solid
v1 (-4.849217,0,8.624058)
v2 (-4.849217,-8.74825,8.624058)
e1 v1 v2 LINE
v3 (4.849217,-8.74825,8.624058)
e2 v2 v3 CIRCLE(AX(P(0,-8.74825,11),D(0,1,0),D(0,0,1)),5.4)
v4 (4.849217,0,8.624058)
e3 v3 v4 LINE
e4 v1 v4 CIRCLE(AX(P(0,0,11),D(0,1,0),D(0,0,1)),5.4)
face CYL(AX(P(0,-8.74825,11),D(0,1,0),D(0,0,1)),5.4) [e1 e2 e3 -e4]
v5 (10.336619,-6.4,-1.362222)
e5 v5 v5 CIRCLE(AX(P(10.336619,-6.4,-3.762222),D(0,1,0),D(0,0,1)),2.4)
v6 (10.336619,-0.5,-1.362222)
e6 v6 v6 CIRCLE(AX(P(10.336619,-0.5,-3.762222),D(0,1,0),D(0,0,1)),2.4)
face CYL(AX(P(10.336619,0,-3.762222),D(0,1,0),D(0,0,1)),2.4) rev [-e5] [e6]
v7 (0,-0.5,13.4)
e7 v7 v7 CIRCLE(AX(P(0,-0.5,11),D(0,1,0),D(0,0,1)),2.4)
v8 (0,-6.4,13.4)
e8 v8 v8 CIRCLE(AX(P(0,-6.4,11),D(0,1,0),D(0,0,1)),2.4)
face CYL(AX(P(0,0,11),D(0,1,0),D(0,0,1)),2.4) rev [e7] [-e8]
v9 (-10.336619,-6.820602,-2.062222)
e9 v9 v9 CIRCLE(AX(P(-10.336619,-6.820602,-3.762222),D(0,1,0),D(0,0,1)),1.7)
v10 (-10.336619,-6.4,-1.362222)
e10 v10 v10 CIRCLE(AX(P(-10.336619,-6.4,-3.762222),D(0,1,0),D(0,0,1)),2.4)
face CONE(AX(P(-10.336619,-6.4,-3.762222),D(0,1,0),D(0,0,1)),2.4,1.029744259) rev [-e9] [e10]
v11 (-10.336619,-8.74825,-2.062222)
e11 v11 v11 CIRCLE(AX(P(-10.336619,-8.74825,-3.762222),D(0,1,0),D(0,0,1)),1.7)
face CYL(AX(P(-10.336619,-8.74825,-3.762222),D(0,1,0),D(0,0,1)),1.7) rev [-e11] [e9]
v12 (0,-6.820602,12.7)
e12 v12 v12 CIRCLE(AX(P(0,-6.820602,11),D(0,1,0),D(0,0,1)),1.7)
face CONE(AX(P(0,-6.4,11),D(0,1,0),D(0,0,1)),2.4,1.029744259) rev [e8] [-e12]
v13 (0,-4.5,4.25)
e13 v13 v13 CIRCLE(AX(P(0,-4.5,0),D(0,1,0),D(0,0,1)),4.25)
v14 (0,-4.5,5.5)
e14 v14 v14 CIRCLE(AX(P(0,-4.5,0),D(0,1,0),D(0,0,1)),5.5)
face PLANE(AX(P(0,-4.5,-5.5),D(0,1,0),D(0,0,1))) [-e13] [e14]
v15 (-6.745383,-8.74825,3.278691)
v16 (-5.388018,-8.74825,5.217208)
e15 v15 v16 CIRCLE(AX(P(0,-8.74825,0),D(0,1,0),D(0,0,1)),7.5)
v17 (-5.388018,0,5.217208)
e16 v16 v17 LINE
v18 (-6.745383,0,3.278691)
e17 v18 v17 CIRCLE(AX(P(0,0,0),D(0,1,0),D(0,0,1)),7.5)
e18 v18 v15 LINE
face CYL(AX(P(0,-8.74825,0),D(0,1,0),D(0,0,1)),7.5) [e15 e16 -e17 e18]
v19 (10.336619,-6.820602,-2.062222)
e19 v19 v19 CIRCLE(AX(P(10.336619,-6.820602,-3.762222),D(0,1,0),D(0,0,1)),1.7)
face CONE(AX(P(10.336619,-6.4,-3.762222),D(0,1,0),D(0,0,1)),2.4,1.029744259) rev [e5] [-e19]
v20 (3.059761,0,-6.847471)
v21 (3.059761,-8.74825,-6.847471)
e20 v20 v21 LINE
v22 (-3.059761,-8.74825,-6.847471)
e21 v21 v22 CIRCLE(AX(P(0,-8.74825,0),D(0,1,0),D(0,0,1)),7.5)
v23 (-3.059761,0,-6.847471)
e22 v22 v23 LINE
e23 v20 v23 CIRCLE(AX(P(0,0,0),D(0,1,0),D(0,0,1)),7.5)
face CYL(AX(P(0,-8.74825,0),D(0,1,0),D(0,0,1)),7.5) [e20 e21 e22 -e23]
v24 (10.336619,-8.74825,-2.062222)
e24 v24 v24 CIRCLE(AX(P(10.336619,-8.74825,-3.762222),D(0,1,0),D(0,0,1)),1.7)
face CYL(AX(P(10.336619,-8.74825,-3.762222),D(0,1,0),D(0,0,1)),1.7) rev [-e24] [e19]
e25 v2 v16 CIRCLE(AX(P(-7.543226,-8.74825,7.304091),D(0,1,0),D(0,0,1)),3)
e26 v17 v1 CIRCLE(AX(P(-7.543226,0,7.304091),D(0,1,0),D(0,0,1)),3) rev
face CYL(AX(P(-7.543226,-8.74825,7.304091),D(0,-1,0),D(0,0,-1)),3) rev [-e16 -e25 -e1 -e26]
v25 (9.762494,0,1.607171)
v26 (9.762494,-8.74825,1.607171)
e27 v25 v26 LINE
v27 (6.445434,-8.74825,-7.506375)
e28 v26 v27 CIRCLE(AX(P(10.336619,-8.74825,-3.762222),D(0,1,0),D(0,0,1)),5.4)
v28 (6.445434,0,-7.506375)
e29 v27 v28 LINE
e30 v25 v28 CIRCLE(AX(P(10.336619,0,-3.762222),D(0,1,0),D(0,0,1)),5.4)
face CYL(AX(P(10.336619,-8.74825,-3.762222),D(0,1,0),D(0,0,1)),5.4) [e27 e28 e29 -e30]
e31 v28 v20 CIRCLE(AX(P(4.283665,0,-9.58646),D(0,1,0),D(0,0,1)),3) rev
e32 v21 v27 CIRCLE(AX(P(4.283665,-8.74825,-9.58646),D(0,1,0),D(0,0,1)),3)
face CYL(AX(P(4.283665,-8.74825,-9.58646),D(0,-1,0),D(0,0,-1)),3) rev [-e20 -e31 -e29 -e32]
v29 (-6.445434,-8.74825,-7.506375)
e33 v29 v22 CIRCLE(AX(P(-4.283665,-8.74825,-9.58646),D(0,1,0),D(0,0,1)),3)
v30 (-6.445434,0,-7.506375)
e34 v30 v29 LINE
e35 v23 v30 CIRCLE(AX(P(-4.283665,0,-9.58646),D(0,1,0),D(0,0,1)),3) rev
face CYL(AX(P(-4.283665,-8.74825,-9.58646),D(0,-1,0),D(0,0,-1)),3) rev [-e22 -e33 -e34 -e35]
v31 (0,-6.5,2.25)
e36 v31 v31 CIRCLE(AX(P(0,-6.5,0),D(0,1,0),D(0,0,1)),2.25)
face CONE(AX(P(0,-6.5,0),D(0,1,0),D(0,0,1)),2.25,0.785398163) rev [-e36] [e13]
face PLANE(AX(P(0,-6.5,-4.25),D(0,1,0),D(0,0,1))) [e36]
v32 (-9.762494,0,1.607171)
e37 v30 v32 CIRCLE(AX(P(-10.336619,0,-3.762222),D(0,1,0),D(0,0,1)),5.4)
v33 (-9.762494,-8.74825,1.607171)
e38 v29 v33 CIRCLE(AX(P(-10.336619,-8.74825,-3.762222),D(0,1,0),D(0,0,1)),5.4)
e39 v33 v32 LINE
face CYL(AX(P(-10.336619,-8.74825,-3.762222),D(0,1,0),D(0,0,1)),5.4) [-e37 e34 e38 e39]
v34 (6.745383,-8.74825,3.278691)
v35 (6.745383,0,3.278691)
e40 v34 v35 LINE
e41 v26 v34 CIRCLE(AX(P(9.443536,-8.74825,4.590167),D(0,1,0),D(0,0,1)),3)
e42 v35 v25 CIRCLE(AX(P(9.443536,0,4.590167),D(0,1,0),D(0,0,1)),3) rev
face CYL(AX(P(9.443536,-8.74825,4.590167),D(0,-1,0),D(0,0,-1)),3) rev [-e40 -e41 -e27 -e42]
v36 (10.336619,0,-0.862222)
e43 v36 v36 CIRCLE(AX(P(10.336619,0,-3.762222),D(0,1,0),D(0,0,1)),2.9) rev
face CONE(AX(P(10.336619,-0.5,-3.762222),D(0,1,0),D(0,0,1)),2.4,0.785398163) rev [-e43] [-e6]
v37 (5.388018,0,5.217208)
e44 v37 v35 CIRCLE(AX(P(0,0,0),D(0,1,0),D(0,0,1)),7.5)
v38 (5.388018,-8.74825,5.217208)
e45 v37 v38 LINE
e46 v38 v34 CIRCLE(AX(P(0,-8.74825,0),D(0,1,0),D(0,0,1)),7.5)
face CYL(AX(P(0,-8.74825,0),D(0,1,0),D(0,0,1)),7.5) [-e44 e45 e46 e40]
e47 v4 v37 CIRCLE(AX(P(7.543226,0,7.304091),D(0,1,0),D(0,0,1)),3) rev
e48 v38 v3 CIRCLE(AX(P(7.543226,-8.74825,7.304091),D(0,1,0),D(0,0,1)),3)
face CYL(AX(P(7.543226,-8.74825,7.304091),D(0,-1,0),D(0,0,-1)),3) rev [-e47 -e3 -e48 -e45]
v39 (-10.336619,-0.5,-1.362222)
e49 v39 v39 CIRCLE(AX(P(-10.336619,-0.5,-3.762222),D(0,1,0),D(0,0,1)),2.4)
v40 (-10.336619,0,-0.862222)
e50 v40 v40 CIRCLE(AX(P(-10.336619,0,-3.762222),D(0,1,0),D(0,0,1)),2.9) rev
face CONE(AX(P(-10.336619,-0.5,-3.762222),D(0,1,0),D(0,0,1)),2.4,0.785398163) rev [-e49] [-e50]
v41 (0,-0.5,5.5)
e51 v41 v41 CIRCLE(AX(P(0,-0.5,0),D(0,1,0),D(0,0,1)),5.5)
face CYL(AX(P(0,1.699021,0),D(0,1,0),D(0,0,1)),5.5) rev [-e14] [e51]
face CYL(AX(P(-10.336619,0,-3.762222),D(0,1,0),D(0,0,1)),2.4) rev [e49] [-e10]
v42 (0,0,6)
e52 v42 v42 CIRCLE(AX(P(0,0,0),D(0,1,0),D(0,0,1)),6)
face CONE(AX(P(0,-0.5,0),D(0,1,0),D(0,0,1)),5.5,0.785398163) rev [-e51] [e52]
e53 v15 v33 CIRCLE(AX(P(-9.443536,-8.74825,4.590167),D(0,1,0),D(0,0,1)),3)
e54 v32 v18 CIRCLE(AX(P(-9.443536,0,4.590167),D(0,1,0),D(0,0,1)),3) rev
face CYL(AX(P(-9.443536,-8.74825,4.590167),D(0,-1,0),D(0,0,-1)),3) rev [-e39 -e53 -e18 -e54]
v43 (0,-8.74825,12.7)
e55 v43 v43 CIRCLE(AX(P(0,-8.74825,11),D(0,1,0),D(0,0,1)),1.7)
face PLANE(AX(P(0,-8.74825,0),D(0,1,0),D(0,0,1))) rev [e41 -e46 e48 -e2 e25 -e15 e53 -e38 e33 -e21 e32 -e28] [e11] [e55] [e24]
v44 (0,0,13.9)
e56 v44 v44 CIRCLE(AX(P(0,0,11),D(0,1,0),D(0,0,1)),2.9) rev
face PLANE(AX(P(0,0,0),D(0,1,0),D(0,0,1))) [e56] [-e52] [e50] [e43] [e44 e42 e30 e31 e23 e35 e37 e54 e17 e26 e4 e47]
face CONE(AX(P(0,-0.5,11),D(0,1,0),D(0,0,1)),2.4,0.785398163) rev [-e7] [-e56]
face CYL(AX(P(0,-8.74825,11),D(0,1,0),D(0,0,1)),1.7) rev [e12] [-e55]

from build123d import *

# Parameters (mm, degrees)
SKETCH1_R                      = 1.7
BOSS_EXTRUDE1_DEPTH            = 8.74825
F_4_8_4_8_DIAMETER_HOLE1_D     = 4.8
F_4_8_4_8_DIAMETER_HOLE1_DEPTH = 6.4
F_4_8_4_8_DIAMETER_HOLE1_TIP   = 1.442065486
CHANFREIN3_SIZE                = 0.5
FILLET1_R                      = 3
CHANFREIN2_SIZE                = 2


with BuildPart() as part:
    # Sketch1 → Boss-Extrude1 (new body)
    with BuildSketch(Plane(origin=(0, 0, 0), x_dir=(1, 0, 0), z_dir=(0, 1, 0))):
        with BuildLine():
            ThreePointArc((-3.307377147, -6.731363636), (0, -16.4), (3.307377147, -6.731363636))
            ThreePointArc((3.307377147, -6.731363636), (6.143640332, -4.301823273), (7.456602343, -0.805655944))
            ThreePointArc((7.456602343, -0.805655944), (15.410958981, 5.609130351), (5.194223131, 5.410179855))
            ThreePointArc((5.194223131, 5.410179855), (0, 7.5), (-5.194223131, 5.410179855))
            ThreePointArc((-5.194223131, 5.410179855), (-15.410958981, 5.609130351), (-7.456602343, -0.805655944))
            ThreePointArc((-7.456602343, -0.805655944), (-6.143640332, -4.301823273), (-3.307377147, -6.731363636))
        make_face()
        with Locations(Location((0, -11, 0), (0, 0, 270))):
            Circle(SKETCH1_R, mode=Mode.SUBTRACT)
        with Locations(Location((-10.336618829, 3.762221577, 0), (0, 0, 270))):
            Circle(SKETCH1_R, mode=Mode.SUBTRACT)
        with Locations(Location((10.336618829, 3.762221577, 0), (0, 0, 270))):
            Circle(SKETCH1_R, mode=Mode.SUBTRACT)
    extrude(amount=-BOSS_EXTRUDE1_DEPTH)

    # Ø4.8 (4.8) Diameter Hole1
    with Locations(Plane(origin=(0, 0, 0), x_dir=(1, 0, 0), z_dir=(0, 1, 0))):
        with Locations((-10.336618829, 3.762221577), (10.336618829, 3.762221577), (0, -11)):
            Hole(F_4_8_4_8_DIAMETER_HOLE1_D / 2, depth=F_4_8_4_8_DIAMETER_HOLE1_DEPTH)
            with Locations((0, 0, -(F_4_8_4_8_DIAMETER_HOLE1_DEPTH + F_4_8_4_8_DIAMETER_HOLE1_TIP / 2))):  # 118° drill point
                Cone(0, F_4_8_4_8_DIAMETER_HOLE1_D / 2, F_4_8_4_8_DIAMETER_HOLE1_TIP, mode=Mode.SUBTRACT)

    # Chanfrein3
    chanfrein3_edges = [part.edges().sort_by_distance(p)[0] for p in [
        (2.4, 0, 11),
        (12.736618829, 0, -3.762221577),
        (-7.936618829, 0, -3.762221577),
    ]]
    chamfer(chanfrein3_edges, length=CHANFREIN3_SIZE)

    # Sketch2 → Cut-Revolve1 (revolve, cut)
    with BuildSketch(Plane(origin=(0, 0, 0), x_dir=(0, 0, -1), z_dir=(1, 0, 0)), mode=Mode.PRIVATE) as cut_revolve1_sk:
        Polygon((0, 0), (6, 0), (5.5, -0.5), (5.5, -4.5), (4.25, -4.5), (4.25, -6.5), (0, -6.5), align=None)
    revolve(cut_revolve1_sk.sketch.rotate(Axis((0, 1.69902052, 0), (0, -1, 0)), 180), axis=Axis((0, 1.69902052, 0), (0, -1, 0)), mode=Mode.SUBTRACT)

    # Fillet1
    fillet1_edges = [part.edges().sort_by_distance(p)[0] for p in [
        (3.307377147, -4.374125, 6.731363636),
        (-3.307377147, -4.374125, 6.731363636),
        (-7.456602343, -4.374125, 0.805655944),
        (-5.194223131, -4.374125, -5.410179855),
        (5.194223131, -4.374125, -5.410179855),
        (7.456602343, -4.374125, 0.805655944),
    ]]
    fillet(fillet1_edges, radius=FILLET1_R)

    # Chanfrein2
    chanfrein2_edges = [part.edges().sort_by_distance(p)[0] for p in [
        (0, -6.5, -4.25),
    ]]
    chamfer(chanfrein2_edges, length=CHANFREIN2_SIZE - 0.0001)  # a hair under: the kernel refuses the full size


solid = part.part
